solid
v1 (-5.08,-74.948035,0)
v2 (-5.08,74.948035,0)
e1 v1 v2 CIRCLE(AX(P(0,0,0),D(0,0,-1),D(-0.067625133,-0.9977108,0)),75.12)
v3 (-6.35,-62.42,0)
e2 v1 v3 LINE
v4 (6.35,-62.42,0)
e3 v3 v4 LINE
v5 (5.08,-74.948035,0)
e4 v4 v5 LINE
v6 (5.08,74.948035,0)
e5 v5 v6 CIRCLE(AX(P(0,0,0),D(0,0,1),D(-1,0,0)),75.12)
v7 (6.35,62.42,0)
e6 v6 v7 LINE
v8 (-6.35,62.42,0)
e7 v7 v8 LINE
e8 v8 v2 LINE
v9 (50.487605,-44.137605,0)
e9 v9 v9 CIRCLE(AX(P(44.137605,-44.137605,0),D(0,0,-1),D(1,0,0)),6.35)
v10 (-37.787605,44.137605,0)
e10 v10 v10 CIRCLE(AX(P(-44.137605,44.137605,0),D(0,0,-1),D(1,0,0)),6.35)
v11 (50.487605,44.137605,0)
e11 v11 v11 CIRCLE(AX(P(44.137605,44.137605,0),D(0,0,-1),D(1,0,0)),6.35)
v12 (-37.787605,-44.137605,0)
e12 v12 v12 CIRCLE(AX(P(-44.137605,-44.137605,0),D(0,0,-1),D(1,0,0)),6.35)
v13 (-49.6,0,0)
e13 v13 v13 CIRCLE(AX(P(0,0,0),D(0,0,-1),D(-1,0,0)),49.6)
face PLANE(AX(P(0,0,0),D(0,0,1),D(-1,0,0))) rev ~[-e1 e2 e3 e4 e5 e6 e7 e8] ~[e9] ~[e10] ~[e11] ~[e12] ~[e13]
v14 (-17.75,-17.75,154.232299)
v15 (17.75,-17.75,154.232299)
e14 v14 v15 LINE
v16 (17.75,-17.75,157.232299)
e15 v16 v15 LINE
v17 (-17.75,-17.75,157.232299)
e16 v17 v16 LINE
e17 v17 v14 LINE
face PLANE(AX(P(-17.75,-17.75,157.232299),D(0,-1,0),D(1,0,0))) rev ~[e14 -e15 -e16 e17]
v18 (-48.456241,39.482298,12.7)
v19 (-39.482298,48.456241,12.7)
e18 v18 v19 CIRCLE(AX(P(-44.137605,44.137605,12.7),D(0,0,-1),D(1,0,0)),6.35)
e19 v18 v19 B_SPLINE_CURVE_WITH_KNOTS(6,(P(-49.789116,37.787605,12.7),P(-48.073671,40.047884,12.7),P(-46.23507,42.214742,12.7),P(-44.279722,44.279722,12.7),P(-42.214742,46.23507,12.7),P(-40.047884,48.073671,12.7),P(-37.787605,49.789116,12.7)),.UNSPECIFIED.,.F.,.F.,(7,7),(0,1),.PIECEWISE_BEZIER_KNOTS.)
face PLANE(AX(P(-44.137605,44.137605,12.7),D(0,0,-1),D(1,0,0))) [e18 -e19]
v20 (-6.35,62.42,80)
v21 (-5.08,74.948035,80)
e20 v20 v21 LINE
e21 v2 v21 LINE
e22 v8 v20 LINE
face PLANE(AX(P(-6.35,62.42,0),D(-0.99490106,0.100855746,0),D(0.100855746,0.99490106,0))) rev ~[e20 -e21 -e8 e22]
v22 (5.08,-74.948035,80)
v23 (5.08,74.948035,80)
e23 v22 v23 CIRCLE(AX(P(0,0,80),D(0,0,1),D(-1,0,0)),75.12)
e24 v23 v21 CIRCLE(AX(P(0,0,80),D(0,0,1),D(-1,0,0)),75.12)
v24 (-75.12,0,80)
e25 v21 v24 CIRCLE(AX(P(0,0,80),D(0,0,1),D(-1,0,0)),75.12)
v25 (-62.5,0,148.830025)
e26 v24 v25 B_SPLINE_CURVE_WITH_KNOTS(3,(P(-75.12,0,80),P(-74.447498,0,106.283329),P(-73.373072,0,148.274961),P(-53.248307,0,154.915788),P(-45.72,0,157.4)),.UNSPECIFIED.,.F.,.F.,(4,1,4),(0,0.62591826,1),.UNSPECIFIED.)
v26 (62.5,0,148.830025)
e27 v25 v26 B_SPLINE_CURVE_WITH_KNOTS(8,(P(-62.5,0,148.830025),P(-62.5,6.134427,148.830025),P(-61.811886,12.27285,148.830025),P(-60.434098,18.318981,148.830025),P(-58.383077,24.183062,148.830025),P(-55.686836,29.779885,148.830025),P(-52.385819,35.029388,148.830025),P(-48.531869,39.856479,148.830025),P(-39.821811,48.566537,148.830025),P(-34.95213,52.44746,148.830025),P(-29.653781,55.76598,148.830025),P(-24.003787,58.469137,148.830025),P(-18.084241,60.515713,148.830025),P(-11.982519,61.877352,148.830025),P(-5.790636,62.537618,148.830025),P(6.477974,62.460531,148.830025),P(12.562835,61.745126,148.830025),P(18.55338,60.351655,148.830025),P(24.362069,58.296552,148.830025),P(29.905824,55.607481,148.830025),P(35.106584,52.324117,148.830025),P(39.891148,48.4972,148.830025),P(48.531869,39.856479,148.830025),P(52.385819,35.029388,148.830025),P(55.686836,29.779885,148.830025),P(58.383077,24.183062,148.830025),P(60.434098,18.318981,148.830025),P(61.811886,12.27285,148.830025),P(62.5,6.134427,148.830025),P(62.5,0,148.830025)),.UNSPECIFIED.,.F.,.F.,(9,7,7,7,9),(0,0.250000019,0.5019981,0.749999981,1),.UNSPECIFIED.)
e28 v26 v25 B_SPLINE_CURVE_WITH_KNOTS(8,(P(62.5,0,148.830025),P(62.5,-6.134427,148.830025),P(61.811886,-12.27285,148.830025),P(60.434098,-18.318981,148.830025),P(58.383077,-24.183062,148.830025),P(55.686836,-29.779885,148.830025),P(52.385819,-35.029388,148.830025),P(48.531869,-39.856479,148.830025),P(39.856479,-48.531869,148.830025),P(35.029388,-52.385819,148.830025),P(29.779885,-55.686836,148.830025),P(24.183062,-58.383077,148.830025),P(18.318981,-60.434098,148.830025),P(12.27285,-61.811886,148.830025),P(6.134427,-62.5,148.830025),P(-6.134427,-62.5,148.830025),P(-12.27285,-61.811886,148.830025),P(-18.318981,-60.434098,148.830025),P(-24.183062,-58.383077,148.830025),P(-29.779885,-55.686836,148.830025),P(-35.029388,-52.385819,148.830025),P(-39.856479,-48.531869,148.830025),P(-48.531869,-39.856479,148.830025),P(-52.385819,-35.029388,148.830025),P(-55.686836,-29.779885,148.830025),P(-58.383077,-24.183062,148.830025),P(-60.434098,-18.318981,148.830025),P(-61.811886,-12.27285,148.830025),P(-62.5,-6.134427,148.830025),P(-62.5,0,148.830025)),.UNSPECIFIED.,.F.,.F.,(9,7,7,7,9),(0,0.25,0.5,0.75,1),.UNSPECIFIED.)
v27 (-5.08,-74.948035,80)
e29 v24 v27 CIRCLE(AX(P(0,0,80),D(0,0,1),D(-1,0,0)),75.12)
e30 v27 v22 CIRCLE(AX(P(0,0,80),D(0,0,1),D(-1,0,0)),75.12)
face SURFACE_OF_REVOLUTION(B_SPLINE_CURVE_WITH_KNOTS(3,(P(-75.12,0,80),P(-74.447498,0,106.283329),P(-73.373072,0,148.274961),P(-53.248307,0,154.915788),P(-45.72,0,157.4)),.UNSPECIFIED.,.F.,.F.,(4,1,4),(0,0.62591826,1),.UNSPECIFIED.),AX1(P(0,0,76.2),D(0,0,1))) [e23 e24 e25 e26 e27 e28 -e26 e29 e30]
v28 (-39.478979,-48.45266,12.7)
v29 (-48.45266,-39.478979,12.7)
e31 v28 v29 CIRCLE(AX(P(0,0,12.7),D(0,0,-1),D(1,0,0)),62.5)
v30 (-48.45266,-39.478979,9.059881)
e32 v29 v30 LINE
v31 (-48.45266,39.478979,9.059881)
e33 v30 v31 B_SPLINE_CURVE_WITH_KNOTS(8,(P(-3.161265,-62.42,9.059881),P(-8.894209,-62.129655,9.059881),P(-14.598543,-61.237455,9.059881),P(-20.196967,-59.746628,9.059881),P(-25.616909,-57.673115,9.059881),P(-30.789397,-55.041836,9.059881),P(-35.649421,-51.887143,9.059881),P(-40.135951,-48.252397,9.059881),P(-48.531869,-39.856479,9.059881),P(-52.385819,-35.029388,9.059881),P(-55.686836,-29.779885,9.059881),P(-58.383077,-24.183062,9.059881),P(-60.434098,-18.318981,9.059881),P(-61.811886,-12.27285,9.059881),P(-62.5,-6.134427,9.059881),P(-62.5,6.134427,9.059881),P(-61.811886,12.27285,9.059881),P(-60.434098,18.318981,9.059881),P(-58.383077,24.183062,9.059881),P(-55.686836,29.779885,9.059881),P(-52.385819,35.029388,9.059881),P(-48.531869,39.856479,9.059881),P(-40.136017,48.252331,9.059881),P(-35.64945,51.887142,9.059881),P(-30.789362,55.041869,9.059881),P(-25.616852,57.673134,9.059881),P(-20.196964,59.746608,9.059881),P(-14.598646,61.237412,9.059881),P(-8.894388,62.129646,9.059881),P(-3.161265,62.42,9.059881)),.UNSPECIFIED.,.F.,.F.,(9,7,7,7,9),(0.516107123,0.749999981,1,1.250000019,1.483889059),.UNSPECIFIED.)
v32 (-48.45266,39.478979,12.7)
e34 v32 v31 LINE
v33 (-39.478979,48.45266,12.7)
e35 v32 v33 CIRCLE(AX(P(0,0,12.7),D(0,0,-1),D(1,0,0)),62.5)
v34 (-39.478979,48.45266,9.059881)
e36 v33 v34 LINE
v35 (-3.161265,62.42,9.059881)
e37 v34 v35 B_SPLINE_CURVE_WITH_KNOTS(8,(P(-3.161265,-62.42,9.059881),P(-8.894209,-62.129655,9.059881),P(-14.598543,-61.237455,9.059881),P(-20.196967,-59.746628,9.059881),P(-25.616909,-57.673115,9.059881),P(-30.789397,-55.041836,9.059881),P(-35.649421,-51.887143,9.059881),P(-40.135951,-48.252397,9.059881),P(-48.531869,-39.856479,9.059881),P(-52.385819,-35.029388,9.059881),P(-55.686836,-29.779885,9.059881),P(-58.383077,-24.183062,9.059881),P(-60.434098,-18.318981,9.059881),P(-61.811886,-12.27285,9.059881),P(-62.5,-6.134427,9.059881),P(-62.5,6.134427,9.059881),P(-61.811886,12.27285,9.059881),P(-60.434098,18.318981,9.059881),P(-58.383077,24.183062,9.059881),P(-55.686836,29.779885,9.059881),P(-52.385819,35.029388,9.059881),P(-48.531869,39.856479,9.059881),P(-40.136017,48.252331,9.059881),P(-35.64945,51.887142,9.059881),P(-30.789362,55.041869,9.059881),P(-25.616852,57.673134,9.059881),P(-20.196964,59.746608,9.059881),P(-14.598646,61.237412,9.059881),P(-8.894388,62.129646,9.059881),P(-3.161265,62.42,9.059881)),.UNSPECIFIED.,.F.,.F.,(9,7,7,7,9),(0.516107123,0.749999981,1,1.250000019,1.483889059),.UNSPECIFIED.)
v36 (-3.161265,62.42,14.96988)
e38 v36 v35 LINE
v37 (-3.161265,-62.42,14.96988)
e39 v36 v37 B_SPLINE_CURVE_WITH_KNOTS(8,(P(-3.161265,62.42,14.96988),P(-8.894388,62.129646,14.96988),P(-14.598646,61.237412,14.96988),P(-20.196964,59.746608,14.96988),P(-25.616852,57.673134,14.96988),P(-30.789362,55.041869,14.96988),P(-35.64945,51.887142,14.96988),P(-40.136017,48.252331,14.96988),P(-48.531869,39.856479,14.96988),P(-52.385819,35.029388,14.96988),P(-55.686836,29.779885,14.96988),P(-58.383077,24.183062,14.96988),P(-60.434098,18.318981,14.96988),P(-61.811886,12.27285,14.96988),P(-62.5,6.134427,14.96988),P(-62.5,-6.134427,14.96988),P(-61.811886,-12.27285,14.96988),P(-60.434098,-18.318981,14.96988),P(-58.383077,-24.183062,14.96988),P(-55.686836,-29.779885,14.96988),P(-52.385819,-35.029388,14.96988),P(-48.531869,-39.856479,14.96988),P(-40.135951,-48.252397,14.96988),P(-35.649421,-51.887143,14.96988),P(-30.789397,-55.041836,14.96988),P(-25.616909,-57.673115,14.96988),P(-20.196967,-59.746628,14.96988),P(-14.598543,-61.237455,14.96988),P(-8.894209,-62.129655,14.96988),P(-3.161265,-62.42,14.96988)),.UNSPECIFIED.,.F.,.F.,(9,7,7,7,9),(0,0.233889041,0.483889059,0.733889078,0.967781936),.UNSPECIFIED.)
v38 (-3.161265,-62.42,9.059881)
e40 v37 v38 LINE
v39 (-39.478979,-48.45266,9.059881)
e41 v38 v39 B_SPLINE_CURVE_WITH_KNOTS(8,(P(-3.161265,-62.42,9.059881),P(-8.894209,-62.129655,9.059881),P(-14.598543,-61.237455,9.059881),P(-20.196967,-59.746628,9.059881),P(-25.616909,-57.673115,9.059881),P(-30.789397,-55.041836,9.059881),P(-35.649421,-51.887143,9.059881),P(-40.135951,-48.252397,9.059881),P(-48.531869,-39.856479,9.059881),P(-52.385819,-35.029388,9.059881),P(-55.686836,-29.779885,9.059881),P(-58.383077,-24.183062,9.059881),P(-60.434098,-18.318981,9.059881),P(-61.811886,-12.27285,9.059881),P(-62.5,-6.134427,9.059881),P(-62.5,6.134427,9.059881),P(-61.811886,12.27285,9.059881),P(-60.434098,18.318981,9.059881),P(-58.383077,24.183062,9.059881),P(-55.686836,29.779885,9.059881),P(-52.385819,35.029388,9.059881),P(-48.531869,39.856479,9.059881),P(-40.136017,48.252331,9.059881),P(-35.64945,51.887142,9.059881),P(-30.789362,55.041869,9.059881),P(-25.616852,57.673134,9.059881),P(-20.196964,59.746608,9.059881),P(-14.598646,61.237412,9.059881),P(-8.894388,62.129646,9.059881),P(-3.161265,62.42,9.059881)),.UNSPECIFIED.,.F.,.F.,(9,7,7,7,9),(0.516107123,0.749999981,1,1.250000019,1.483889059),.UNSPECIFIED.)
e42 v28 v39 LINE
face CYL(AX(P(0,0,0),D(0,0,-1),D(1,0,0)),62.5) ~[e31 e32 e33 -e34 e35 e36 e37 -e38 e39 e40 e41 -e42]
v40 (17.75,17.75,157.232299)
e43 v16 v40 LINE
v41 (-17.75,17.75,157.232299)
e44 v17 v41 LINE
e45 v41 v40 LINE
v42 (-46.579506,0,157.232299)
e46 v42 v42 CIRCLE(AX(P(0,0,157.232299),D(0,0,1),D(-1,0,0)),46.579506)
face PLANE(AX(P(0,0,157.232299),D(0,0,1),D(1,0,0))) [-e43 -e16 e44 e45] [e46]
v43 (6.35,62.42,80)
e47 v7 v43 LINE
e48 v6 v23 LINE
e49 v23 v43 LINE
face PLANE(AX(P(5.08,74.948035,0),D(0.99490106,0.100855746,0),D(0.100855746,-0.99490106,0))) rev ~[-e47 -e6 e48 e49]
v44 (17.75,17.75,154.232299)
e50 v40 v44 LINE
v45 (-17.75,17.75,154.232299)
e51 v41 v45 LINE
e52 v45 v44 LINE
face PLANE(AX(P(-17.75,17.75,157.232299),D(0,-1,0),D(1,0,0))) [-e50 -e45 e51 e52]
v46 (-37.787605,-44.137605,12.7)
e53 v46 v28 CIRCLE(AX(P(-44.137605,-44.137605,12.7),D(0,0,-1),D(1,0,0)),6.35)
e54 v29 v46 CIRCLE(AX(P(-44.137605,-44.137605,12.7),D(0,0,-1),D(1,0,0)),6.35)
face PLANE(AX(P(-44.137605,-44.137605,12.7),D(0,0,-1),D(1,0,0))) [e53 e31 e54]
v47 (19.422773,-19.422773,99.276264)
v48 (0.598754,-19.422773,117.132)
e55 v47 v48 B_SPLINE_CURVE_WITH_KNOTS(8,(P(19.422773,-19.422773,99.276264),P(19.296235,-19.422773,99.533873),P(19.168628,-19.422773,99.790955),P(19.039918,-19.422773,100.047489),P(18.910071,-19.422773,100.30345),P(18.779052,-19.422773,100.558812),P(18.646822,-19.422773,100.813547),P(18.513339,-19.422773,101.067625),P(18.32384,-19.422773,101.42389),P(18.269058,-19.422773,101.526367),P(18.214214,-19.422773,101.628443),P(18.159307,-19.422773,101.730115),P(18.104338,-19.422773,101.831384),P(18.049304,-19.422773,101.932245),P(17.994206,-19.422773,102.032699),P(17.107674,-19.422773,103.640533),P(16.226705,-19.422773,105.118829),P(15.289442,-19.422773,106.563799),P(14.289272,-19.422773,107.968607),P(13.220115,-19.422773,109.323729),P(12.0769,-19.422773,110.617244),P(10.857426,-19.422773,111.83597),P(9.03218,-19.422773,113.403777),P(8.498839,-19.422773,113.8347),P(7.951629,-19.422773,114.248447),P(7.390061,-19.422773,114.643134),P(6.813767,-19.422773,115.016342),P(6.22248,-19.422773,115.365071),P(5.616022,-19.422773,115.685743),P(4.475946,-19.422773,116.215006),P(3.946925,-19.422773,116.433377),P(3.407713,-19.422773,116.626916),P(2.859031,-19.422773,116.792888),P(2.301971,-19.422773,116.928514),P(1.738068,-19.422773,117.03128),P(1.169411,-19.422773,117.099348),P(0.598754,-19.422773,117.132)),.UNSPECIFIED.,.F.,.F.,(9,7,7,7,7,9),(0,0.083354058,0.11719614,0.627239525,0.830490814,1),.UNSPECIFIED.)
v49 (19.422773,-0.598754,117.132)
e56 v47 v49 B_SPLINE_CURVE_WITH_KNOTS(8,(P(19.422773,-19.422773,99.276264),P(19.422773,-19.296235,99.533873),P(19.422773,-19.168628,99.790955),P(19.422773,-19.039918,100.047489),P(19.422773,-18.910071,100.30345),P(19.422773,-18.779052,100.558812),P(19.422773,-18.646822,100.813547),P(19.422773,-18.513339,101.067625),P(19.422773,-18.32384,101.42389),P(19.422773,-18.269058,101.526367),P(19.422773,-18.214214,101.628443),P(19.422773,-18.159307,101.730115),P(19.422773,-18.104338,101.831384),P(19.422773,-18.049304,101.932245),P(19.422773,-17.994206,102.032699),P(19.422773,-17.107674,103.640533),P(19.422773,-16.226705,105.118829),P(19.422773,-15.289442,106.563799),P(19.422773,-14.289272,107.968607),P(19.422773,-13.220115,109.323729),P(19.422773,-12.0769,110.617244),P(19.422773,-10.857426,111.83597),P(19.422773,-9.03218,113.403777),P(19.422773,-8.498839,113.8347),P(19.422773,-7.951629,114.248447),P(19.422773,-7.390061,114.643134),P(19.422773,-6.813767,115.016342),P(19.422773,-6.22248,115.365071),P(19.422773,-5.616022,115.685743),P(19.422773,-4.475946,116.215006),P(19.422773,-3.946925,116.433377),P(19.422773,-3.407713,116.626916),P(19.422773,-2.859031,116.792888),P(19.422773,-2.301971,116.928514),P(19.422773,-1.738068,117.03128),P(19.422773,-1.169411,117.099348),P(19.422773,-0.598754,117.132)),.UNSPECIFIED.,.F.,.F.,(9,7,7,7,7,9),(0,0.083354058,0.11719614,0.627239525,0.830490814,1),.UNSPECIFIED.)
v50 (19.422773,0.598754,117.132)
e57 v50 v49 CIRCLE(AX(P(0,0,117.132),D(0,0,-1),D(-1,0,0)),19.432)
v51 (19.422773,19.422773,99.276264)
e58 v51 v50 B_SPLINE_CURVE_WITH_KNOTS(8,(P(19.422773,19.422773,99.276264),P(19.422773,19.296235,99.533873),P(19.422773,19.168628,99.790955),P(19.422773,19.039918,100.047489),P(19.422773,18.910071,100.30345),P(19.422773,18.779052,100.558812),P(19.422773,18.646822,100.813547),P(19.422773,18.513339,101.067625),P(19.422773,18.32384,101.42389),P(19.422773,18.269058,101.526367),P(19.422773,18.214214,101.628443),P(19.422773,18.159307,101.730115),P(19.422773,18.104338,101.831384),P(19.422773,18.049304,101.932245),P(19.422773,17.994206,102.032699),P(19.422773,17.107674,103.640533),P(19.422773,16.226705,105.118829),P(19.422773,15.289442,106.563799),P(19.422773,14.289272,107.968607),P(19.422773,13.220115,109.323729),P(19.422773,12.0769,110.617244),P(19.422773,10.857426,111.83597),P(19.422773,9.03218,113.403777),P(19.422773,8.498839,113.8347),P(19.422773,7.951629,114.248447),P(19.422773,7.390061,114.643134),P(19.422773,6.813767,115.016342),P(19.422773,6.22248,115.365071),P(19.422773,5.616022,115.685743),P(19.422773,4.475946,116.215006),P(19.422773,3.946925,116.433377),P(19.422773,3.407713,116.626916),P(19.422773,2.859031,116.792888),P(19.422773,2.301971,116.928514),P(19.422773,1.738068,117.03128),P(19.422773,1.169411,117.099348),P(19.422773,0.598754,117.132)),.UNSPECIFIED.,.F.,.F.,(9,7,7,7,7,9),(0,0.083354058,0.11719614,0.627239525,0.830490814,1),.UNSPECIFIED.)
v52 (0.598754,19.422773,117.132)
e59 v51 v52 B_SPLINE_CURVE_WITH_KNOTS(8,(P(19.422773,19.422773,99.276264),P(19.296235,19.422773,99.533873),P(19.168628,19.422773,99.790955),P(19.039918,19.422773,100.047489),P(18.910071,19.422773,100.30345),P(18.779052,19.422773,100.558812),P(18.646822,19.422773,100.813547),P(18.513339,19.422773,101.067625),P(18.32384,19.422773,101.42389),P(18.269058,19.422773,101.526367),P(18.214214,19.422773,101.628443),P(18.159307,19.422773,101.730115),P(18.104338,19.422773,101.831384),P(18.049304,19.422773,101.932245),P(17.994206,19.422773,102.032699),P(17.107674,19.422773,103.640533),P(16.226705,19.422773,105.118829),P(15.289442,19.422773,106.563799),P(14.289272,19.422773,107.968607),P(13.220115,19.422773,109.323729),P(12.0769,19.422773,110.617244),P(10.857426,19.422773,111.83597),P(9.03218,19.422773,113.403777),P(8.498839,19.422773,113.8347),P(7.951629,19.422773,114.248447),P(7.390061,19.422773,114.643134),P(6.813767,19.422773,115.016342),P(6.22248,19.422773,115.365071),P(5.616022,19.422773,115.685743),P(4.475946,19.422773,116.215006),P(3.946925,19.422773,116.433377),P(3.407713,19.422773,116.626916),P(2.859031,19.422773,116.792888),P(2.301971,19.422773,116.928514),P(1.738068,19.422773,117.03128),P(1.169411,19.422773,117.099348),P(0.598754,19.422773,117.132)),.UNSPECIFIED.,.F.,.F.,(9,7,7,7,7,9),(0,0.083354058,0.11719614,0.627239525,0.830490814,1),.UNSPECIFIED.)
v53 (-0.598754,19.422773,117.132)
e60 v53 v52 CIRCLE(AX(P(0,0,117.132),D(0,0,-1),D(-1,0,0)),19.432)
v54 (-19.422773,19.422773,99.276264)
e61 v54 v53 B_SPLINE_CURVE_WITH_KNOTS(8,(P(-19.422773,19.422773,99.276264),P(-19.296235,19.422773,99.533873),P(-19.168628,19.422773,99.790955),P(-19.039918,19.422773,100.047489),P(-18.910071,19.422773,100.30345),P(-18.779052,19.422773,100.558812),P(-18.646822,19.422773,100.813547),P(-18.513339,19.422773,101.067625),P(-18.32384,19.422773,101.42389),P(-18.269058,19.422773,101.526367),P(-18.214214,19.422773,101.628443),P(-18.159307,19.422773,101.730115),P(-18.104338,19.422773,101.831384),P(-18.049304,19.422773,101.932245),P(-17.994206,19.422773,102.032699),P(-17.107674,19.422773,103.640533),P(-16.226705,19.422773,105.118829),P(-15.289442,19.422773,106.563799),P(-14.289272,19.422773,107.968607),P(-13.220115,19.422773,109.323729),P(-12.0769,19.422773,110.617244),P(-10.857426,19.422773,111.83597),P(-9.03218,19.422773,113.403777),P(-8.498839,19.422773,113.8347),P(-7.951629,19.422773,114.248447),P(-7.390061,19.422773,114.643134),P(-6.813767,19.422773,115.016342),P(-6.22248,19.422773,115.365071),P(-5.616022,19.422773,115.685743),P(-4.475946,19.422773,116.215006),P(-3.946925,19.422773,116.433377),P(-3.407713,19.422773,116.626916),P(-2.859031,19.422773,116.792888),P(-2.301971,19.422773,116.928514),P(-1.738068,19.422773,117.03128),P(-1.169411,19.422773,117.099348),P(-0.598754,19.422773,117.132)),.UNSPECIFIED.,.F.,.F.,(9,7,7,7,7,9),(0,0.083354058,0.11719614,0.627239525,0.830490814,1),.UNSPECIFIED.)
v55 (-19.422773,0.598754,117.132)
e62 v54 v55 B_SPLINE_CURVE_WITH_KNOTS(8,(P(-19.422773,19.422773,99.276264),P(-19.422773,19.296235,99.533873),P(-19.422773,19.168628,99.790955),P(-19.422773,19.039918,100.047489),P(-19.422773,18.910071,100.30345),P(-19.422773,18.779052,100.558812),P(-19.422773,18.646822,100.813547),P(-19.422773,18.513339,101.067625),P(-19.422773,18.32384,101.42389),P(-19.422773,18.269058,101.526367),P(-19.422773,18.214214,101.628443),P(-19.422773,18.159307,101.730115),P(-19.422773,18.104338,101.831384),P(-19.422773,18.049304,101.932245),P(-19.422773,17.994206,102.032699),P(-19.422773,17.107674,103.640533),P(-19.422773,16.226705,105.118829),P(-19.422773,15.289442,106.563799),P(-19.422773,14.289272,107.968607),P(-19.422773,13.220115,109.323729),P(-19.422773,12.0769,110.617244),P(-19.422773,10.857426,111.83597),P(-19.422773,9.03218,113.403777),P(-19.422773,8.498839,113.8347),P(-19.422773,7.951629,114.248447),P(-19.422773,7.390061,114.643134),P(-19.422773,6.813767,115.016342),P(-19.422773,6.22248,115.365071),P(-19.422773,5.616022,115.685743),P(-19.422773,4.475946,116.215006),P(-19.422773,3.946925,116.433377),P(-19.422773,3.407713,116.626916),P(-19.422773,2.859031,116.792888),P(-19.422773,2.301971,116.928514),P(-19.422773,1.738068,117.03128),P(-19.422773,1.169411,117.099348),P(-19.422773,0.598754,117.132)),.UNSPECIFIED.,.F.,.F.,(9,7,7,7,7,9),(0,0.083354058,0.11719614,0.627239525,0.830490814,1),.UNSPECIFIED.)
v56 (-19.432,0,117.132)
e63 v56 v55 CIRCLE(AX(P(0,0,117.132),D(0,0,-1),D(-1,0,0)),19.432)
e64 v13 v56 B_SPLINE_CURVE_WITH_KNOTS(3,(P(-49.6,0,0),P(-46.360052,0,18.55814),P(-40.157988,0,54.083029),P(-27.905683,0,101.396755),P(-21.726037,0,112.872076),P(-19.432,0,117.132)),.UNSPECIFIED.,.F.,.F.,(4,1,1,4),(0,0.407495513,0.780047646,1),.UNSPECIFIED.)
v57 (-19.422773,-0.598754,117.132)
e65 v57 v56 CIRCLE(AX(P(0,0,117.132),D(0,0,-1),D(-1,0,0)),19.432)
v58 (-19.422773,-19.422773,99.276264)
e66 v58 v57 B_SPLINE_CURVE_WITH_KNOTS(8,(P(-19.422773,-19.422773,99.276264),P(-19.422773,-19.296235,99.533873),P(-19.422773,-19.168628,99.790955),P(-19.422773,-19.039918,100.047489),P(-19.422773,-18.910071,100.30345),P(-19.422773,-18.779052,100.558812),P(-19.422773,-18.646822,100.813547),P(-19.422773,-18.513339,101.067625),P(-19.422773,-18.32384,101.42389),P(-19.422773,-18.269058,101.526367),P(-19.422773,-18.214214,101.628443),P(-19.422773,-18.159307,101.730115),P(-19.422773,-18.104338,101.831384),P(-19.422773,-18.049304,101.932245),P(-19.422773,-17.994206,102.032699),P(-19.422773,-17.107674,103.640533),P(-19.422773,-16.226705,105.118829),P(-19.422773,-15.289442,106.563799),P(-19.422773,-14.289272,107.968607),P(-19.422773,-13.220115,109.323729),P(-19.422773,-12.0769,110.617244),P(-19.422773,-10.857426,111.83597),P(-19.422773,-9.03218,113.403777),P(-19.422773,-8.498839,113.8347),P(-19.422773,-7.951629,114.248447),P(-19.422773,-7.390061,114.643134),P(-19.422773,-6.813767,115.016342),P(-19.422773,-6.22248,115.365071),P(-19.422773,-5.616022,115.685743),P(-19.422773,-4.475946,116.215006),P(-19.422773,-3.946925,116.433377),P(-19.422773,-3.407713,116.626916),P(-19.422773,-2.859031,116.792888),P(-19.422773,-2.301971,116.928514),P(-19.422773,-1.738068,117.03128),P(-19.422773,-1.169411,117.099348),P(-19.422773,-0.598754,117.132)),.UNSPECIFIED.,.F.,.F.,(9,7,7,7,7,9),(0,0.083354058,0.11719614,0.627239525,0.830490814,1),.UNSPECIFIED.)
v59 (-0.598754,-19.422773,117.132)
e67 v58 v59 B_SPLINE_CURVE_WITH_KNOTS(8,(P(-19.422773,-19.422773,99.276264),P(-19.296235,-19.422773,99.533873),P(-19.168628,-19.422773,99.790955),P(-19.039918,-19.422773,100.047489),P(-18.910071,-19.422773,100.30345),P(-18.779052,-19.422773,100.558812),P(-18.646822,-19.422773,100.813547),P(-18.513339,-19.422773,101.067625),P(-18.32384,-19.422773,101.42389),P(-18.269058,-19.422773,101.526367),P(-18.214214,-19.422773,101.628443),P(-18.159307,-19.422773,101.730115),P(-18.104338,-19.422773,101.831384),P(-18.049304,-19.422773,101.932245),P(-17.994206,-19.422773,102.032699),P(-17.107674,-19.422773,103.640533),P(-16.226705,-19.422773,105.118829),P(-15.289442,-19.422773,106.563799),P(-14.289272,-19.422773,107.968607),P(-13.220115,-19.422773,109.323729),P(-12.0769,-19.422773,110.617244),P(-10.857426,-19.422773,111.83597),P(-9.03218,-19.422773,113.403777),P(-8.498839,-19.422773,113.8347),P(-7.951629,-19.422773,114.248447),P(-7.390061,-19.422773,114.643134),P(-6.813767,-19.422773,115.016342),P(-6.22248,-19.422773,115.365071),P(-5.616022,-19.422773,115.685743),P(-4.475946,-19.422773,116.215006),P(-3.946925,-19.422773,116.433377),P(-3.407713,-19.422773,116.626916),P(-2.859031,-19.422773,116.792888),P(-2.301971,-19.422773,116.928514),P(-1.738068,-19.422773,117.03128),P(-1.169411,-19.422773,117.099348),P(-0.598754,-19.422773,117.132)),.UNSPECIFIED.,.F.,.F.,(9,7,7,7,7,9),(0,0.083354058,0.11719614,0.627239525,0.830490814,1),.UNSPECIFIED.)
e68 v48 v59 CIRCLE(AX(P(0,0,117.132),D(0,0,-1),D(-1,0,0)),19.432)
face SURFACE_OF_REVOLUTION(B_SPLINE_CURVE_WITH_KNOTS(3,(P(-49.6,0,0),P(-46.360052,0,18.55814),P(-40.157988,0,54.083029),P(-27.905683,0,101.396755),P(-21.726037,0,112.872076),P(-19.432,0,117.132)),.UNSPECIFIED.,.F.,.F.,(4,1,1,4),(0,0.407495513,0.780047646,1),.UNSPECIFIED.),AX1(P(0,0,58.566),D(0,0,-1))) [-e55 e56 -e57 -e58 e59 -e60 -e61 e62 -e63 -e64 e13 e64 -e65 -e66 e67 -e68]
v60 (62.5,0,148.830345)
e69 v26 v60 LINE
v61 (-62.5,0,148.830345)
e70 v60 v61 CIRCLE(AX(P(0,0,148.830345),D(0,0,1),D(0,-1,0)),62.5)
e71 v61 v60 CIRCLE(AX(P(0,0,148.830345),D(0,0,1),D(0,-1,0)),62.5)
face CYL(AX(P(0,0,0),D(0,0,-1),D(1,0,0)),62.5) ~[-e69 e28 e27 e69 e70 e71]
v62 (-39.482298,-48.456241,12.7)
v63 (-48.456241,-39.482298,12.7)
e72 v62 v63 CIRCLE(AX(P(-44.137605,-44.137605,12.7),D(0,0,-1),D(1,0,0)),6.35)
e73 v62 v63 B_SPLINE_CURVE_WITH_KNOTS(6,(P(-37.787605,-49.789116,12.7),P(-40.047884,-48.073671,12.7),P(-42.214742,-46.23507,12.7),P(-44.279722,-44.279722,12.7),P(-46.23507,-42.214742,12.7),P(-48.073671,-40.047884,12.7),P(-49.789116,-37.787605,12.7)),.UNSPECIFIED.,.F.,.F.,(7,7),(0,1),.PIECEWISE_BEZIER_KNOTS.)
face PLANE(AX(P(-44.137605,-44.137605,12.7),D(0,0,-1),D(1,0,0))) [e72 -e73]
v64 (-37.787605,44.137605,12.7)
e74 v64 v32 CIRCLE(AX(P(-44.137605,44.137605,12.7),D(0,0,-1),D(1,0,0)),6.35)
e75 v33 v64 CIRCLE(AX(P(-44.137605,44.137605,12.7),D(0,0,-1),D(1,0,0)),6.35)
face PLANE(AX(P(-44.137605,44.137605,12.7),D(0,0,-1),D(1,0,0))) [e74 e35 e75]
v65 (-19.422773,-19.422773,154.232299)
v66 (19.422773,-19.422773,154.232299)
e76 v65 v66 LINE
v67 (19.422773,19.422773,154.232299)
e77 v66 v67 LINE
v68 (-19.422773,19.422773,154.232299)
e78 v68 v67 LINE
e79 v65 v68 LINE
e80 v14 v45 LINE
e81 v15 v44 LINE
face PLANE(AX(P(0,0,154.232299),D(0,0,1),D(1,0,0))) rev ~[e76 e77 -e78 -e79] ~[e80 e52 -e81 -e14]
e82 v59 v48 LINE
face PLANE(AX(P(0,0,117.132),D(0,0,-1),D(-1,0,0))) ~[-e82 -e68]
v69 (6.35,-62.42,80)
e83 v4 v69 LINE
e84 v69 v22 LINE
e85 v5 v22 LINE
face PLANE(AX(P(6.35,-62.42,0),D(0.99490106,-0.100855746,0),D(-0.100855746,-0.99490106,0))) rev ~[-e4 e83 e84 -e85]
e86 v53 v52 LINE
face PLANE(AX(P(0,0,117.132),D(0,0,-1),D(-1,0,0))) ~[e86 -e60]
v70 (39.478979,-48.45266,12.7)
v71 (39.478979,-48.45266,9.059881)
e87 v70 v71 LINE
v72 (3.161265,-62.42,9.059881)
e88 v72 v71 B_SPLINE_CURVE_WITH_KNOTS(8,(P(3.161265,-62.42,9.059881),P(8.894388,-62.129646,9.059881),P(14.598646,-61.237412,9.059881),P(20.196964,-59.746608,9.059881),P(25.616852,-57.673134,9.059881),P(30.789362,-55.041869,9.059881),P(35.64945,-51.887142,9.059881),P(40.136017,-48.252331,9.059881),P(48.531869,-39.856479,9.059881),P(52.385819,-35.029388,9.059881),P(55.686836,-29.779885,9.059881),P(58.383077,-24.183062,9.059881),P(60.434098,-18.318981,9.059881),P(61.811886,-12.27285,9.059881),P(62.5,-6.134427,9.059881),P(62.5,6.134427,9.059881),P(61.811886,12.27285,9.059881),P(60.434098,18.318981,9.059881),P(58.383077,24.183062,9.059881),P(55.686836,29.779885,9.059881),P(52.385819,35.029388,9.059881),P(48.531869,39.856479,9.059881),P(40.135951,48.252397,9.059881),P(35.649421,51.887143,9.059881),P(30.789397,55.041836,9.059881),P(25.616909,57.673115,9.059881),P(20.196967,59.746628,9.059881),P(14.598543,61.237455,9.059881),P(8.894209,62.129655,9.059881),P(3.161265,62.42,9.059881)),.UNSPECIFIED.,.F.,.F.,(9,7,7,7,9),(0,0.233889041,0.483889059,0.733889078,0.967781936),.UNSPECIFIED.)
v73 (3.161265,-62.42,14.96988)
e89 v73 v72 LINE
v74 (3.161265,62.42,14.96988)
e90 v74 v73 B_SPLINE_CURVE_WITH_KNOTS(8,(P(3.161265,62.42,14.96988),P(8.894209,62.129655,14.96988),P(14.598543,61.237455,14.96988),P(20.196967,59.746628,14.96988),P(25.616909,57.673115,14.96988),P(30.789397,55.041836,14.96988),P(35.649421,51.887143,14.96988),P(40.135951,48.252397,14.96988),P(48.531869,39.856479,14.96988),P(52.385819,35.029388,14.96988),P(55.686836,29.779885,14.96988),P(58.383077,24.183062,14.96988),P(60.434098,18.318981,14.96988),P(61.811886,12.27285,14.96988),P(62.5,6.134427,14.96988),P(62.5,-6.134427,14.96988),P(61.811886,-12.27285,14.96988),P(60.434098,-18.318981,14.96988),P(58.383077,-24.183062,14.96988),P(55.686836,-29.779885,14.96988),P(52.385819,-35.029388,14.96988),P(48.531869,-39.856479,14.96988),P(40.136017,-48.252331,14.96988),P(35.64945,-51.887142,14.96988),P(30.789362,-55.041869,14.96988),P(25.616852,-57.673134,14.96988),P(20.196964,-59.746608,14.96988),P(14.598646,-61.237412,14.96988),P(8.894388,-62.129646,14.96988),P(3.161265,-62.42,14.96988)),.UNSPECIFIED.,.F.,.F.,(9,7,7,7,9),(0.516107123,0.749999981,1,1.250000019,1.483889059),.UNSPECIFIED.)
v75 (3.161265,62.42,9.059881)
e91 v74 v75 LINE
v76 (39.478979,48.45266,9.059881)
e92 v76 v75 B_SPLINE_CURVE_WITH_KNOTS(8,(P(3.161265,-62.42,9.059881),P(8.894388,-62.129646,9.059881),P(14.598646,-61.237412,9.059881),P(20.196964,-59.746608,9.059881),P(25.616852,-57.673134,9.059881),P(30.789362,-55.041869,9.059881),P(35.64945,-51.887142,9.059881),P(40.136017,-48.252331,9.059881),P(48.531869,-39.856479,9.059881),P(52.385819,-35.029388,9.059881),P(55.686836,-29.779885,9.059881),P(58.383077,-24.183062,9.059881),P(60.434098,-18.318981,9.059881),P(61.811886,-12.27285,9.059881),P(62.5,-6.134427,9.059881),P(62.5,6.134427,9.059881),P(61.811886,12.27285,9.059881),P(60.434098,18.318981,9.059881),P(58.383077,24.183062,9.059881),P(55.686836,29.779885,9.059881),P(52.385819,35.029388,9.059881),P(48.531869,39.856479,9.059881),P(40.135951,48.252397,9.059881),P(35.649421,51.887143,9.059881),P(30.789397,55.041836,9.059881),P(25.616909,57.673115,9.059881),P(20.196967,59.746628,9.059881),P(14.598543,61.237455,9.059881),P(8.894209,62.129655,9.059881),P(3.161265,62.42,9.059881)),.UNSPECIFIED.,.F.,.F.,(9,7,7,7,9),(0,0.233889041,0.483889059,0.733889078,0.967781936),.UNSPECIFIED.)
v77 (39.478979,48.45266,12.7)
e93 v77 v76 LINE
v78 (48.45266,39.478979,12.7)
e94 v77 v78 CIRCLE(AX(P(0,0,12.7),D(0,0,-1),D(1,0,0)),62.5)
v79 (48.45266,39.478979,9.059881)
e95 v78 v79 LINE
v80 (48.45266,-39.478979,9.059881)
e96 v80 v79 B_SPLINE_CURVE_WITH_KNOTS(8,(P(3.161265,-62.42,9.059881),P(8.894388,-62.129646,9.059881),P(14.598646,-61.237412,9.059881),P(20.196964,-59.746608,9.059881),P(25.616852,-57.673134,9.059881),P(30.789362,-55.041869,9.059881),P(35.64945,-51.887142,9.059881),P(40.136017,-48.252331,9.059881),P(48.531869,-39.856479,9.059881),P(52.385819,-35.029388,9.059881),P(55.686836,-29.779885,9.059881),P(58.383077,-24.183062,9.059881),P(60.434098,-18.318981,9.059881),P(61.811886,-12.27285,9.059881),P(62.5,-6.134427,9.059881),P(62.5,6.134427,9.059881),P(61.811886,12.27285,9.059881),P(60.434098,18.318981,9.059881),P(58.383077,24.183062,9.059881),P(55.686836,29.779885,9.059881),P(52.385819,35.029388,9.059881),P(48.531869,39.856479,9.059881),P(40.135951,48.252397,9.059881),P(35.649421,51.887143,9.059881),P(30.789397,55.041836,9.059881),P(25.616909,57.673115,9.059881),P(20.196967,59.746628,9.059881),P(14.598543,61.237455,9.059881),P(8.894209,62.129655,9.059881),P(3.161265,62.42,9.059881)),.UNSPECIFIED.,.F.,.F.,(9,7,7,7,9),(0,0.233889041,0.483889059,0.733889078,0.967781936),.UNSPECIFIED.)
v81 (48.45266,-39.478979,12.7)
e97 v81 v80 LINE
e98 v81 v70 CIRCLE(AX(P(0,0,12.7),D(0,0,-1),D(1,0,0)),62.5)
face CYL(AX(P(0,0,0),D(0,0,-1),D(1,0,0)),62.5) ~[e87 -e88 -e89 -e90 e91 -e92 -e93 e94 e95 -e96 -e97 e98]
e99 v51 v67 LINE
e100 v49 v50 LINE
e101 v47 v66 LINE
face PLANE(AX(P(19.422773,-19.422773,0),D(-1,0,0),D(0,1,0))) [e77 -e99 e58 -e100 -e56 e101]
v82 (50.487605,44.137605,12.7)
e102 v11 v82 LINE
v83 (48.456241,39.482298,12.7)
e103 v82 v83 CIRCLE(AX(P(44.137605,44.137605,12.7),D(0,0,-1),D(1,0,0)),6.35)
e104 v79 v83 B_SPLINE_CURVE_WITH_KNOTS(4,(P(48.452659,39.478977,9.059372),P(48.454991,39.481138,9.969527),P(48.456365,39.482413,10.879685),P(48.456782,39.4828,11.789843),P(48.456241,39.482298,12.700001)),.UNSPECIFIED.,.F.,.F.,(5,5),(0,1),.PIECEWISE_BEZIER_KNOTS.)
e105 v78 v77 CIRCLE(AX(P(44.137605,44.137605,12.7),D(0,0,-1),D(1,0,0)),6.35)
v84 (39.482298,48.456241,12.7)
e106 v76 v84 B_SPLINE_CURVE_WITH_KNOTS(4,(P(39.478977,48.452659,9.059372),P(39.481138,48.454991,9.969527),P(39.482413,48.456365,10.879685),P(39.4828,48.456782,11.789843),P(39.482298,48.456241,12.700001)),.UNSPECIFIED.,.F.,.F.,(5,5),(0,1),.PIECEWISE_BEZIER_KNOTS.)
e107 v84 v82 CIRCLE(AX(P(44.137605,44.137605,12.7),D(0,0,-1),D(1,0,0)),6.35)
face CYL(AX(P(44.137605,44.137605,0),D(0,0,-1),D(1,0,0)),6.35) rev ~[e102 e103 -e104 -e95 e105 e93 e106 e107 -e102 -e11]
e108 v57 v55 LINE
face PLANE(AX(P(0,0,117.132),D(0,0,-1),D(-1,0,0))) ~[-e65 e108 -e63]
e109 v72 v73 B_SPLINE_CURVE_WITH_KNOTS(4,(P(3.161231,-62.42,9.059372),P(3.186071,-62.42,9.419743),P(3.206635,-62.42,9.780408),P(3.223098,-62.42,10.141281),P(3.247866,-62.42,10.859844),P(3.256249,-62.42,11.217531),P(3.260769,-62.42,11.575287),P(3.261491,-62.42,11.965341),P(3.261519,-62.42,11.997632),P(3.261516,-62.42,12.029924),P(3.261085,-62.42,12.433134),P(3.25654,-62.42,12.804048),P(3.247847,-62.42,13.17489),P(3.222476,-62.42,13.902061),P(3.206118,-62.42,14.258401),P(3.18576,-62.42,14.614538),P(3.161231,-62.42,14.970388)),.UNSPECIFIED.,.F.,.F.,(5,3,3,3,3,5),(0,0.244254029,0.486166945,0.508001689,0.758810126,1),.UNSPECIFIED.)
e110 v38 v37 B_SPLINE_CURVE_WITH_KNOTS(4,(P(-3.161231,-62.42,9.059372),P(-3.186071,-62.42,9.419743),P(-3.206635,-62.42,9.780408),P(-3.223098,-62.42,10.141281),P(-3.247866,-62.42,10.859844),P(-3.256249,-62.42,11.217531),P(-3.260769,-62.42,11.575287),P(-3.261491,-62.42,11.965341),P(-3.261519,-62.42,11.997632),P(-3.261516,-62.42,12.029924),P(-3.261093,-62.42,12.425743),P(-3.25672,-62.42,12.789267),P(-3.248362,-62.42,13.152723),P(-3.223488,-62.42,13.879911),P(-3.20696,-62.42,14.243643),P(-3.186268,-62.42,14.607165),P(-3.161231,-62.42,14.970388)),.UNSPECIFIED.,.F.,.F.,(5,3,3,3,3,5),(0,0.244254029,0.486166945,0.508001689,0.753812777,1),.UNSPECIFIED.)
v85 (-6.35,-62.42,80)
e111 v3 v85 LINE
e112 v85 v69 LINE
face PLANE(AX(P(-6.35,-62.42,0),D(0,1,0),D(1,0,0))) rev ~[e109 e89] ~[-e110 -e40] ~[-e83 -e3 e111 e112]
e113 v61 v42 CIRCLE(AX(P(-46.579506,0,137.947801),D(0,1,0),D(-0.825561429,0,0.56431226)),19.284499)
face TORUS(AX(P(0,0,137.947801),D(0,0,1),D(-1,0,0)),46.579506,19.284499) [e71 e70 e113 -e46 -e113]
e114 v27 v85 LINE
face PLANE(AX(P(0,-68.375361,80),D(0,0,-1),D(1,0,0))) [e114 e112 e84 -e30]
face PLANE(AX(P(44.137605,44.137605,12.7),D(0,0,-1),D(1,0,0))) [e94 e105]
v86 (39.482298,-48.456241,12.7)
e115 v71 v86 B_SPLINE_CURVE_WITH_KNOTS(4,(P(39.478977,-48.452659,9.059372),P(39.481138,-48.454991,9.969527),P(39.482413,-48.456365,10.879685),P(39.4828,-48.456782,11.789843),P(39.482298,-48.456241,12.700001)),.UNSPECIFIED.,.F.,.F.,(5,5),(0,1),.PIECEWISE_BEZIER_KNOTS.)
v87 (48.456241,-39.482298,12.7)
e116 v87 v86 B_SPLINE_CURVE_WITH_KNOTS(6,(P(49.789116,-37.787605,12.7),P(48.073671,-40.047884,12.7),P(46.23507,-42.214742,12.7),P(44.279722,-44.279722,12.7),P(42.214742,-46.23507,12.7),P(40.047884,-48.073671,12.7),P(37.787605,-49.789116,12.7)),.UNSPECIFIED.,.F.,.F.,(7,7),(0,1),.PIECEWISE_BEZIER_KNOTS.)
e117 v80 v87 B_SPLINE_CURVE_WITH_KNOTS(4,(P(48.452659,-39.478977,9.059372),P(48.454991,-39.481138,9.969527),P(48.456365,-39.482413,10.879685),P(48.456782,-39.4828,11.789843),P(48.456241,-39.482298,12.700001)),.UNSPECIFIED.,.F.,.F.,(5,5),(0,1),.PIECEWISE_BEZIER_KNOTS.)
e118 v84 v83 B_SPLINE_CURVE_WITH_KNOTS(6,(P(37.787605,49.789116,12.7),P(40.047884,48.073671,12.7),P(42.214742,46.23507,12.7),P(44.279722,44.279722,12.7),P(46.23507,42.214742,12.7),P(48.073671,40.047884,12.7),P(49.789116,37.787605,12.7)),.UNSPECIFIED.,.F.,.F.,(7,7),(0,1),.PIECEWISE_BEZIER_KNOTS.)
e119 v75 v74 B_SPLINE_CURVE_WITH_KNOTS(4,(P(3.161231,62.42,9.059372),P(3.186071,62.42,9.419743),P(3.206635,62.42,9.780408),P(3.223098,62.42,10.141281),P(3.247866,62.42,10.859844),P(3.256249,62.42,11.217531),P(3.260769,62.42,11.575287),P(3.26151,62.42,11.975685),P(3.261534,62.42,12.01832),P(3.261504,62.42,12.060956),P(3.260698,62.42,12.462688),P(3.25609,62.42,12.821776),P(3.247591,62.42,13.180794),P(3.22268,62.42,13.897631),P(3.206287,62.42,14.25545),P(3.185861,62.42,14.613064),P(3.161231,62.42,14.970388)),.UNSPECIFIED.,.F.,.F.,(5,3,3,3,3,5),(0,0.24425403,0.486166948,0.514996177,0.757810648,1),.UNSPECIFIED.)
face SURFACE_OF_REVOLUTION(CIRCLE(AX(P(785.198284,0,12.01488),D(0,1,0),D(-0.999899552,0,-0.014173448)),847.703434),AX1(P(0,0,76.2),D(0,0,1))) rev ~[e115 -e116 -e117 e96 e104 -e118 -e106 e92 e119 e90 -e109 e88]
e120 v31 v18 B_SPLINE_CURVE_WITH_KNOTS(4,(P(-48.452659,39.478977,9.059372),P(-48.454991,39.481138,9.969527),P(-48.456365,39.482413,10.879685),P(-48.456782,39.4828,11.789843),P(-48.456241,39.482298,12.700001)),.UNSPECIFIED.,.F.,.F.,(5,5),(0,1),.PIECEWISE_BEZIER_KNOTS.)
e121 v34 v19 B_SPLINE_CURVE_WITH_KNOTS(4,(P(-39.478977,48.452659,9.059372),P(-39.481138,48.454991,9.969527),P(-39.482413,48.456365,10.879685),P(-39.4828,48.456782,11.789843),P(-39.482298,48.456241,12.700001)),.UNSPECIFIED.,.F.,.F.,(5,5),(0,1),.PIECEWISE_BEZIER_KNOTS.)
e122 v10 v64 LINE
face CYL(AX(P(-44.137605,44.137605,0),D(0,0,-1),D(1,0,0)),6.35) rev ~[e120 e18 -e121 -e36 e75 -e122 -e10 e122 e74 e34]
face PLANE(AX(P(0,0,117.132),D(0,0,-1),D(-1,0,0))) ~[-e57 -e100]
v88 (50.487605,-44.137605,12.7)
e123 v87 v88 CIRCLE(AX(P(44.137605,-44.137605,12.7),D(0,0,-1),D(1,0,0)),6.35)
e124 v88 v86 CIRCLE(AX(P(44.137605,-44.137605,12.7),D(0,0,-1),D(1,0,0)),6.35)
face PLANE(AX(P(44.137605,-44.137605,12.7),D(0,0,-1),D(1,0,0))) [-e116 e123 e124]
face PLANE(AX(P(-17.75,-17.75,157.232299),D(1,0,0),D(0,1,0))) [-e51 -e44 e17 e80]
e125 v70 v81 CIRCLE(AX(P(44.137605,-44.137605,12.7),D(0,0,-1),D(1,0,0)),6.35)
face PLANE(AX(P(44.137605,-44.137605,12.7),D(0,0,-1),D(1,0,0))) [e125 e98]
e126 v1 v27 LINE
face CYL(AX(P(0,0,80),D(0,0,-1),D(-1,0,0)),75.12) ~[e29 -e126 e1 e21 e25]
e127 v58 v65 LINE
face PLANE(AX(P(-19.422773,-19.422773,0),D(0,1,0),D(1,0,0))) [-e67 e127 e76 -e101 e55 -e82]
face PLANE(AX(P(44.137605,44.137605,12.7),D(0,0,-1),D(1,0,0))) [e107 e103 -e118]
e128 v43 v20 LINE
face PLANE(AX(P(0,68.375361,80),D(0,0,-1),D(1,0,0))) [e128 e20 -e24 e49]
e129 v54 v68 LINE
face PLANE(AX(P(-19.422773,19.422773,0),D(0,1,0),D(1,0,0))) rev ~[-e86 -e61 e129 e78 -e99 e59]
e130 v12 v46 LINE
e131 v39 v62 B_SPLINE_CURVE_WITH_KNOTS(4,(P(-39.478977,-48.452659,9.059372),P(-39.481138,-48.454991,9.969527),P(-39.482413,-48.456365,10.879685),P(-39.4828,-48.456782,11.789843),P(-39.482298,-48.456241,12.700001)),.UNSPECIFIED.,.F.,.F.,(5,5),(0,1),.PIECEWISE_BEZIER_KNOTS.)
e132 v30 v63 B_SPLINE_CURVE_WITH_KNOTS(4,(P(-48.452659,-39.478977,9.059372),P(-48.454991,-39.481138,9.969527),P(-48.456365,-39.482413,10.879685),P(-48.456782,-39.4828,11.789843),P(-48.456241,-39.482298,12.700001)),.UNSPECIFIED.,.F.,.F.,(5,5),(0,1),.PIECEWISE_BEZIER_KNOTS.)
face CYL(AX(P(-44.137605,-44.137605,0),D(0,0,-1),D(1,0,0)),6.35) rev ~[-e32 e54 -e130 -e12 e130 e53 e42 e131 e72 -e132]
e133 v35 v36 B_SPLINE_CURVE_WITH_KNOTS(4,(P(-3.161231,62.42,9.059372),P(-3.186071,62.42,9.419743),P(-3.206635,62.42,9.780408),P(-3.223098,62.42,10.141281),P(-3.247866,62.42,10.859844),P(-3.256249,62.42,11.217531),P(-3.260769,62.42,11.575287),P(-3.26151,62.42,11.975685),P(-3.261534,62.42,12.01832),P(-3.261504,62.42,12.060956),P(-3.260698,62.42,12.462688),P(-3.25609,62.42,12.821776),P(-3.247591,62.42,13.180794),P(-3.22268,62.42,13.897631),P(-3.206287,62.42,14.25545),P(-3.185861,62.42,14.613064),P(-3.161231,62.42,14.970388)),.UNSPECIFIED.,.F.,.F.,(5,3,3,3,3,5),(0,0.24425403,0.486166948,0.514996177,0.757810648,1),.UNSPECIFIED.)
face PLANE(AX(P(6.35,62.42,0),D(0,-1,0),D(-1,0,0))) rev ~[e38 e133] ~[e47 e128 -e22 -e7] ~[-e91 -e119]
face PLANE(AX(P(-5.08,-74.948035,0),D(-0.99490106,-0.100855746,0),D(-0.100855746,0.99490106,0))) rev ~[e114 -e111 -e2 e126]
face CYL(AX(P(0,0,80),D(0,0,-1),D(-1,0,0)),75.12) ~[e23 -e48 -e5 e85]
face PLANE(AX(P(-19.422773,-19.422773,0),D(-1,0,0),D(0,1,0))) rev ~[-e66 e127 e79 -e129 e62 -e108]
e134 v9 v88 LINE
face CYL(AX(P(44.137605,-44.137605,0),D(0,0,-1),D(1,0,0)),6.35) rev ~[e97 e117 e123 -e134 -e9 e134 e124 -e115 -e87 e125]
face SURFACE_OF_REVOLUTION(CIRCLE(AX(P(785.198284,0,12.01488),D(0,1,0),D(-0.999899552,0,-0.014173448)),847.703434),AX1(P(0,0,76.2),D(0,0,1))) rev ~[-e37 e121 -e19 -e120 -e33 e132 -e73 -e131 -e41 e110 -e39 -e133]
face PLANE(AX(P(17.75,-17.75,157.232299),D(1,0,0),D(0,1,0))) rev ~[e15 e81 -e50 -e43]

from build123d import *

# Parameters (mm, degrees)
F2_R      = 62.5
F2_W      = 38.8455463488
F2_H      = 38.8455463488
F3_DEPTH  = 157.39
F8_W      = 38.8455463488
F8_H      = 38.8455463488
F8_W_2    = 35.5
F8_H_2    = 35.5
F9_DEPTH  = 3
F11_DEPTH = 80
F12_R     = 6.35
F13_DEPTH = 12.7


# Not quite as in the source:
# - a feature names something its author has since deleted; it is built from what else it names


with BuildPart() as f1:
    # F0 (on Front) → F1 (revolve)
    with BuildSketch(Plane.XZ):
        with BuildLine():
            ThreePointArc((-62.42, 0), (-60.0517541619, 76.462422463), (-50.8, 152.4))
            Line((-50.8, 152.4), (-45.72, 152.4))
            Line((-45.72, 152.4), (-45.72, 157.4))
            add(Edge.make_bspline(
                [(-75.12, 80), (-74.447497537, 106.2833289956), (-73.373072159, 148.2749606206), (-53.2483071241, 154.9157878093), (-45.72, 157.4)],
                knots=[0, 0, 0, 0, 0.6259182599, 1, 1, 1, 1], degree=3))
            Line((-75.12, 80), (-75.12, 0))
            Line((-75.12, 0), (-62.42, 0))
        make_face()
    revolve(axis=Axis((0, 0, 76.2), (0, 0, 1)))

    # F2 (on Top) → F3 (join)
    with BuildSketch(Plane.XY):
        Circle(F2_R)
        Rectangle(F2_W, F2_H, mode=Mode.SUBTRACT)
    extrude(amount=F3_DEPTH)

    # F5 (on Front) → F6 (revolve, cut)
    with BuildSketch(Plane.XZ):
        with BuildLine():
            Line((-19.432, 0), (0, 0))
            Line((0, 0), (0, 117.132))
            Line((0, 117.132), (-19.432, 117.132))
            add(Edge.make_bspline(
                [(-49.6, 0), (-46.3600523587, 18.5581395922), (-40.1579876774, 54.0830291461), (-27.905682613, 101.3967550255), (-21.7260374714, 112.8720762759), (-19.432, 117.132)],
                knots=[0, 0, 0, 0, 0.4074955134, 0.7800476463, 1, 1, 1, 1], degree=3))
            Line((-49.6, 0), (-19.432, 0))
        make_face()
    revolve(axis=Axis((0, 0, 58.566), (0, 0, -1)), mode=Mode.SUBTRACT)

    # F4 (on Front) → F7 (revolve, cut)
    with BuildSketch(Plane.XZ):
        with BuildLine():
            Line((-59.5792606473, 163.4935438633), (-68.9641386271, 155.4379612207))
            Line((-68.9641386271, 155.4379612207), (-62.5000447035, 148.8302797079))
            ThreePointArc((-62.5000447035, 148.8302797079), (-55.5803045517, 155.0029325492), (-46.5795062482, 157.2322994471))
            Line((-46.5795062482, 157.2322994471), (0, 157.2322994471))
            Line((0, 157.2322994471), (0, 165.5570715666))
            Line((0, 165.5570715666), (-59.5792606473, 163.4935438633))
        make_face()
    revolve(axis=Axis((0, 0, 161.3946855068), (0, 0, 1)), mode=Mode.SUBTRACT)

    # F8 (on face) → F9 (join)
    with BuildSketch(Plane.XY.offset(157.2322994471)):
        Rectangle(F8_W, F8_H)
        Rectangle(F8_W_2, F8_H_2, mode=Mode.SUBTRACT)
    extrude(amount=-F9_DEPTH)

    # F10 (on face) → F11 (cut)
    with BuildSketch(Plane(origin=(0, 0, 0), x_dir=(1, 0, 0), z_dir=(0, 0, -1))):
        with BuildLine():
            Line((-6.35, 62.42), (6.35, 62.42))
            Line((6.35, 62.42), (5.08, 74.9480353312))
            ThreePointArc((5.08, 74.9480353312), (0, 75.12), (-5.08, 74.9480353312))
            Line((-5.08, 74.9480353312), (-6.35, 62.42))
        make_face()
        with BuildLine():
            ThreePointArc((-5.08, 74.9480353312), (0, 75.12), (5.08, 74.9480353312))
            ThreePointArc((5.08, 74.9480353312), (0, 79.5390976959), (-5.08, 74.9480353312))
        make_face()
        with BuildLine():
            Line((-6.35, -62.42), (-5.08, -74.9480353312))
            ThreePointArc((-5.08, -74.9480353312), (0, -75.12), (5.08, -74.9480353312))
            Line((5.08, -74.9480353312), (6.35, -62.42))
            Line((6.35, -62.42), (-6.35, -62.42))
        make_face()
        with BuildLine():
            ThreePointArc((5.08, -74.9480353312), (0, -75.12), (-5.08, -74.9480353312))
            ThreePointArc((-5.08, -74.9480353312), (0, -79.5390976959), (5.08, -74.9480353312))
        make_face()
    extrude(amount=-F11_DEPTH, mode=Mode.SUBTRACT)

    # F12 (on face) → F13 (cut)
    with BuildSketch(Plane(origin=(0, 0, 0), x_dir=(1, 0, 0), z_dir=(0, 0, -1))):
        with Locations((-44.1376052817, 44.1376052817)):
            Circle(F12_R)
        with Locations((44.1376052817, 44.1376052817)):
            Circle(F12_R)
        with Locations((44.1376052817, -44.1376052817)):
            Circle(F12_R)
        with Locations((-44.1376052817, -44.1376052817)):
            Circle(F12_R)
    extrude(amount=-F13_DEPTH, mode=Mode.SUBTRACT)


solid = f1.part
